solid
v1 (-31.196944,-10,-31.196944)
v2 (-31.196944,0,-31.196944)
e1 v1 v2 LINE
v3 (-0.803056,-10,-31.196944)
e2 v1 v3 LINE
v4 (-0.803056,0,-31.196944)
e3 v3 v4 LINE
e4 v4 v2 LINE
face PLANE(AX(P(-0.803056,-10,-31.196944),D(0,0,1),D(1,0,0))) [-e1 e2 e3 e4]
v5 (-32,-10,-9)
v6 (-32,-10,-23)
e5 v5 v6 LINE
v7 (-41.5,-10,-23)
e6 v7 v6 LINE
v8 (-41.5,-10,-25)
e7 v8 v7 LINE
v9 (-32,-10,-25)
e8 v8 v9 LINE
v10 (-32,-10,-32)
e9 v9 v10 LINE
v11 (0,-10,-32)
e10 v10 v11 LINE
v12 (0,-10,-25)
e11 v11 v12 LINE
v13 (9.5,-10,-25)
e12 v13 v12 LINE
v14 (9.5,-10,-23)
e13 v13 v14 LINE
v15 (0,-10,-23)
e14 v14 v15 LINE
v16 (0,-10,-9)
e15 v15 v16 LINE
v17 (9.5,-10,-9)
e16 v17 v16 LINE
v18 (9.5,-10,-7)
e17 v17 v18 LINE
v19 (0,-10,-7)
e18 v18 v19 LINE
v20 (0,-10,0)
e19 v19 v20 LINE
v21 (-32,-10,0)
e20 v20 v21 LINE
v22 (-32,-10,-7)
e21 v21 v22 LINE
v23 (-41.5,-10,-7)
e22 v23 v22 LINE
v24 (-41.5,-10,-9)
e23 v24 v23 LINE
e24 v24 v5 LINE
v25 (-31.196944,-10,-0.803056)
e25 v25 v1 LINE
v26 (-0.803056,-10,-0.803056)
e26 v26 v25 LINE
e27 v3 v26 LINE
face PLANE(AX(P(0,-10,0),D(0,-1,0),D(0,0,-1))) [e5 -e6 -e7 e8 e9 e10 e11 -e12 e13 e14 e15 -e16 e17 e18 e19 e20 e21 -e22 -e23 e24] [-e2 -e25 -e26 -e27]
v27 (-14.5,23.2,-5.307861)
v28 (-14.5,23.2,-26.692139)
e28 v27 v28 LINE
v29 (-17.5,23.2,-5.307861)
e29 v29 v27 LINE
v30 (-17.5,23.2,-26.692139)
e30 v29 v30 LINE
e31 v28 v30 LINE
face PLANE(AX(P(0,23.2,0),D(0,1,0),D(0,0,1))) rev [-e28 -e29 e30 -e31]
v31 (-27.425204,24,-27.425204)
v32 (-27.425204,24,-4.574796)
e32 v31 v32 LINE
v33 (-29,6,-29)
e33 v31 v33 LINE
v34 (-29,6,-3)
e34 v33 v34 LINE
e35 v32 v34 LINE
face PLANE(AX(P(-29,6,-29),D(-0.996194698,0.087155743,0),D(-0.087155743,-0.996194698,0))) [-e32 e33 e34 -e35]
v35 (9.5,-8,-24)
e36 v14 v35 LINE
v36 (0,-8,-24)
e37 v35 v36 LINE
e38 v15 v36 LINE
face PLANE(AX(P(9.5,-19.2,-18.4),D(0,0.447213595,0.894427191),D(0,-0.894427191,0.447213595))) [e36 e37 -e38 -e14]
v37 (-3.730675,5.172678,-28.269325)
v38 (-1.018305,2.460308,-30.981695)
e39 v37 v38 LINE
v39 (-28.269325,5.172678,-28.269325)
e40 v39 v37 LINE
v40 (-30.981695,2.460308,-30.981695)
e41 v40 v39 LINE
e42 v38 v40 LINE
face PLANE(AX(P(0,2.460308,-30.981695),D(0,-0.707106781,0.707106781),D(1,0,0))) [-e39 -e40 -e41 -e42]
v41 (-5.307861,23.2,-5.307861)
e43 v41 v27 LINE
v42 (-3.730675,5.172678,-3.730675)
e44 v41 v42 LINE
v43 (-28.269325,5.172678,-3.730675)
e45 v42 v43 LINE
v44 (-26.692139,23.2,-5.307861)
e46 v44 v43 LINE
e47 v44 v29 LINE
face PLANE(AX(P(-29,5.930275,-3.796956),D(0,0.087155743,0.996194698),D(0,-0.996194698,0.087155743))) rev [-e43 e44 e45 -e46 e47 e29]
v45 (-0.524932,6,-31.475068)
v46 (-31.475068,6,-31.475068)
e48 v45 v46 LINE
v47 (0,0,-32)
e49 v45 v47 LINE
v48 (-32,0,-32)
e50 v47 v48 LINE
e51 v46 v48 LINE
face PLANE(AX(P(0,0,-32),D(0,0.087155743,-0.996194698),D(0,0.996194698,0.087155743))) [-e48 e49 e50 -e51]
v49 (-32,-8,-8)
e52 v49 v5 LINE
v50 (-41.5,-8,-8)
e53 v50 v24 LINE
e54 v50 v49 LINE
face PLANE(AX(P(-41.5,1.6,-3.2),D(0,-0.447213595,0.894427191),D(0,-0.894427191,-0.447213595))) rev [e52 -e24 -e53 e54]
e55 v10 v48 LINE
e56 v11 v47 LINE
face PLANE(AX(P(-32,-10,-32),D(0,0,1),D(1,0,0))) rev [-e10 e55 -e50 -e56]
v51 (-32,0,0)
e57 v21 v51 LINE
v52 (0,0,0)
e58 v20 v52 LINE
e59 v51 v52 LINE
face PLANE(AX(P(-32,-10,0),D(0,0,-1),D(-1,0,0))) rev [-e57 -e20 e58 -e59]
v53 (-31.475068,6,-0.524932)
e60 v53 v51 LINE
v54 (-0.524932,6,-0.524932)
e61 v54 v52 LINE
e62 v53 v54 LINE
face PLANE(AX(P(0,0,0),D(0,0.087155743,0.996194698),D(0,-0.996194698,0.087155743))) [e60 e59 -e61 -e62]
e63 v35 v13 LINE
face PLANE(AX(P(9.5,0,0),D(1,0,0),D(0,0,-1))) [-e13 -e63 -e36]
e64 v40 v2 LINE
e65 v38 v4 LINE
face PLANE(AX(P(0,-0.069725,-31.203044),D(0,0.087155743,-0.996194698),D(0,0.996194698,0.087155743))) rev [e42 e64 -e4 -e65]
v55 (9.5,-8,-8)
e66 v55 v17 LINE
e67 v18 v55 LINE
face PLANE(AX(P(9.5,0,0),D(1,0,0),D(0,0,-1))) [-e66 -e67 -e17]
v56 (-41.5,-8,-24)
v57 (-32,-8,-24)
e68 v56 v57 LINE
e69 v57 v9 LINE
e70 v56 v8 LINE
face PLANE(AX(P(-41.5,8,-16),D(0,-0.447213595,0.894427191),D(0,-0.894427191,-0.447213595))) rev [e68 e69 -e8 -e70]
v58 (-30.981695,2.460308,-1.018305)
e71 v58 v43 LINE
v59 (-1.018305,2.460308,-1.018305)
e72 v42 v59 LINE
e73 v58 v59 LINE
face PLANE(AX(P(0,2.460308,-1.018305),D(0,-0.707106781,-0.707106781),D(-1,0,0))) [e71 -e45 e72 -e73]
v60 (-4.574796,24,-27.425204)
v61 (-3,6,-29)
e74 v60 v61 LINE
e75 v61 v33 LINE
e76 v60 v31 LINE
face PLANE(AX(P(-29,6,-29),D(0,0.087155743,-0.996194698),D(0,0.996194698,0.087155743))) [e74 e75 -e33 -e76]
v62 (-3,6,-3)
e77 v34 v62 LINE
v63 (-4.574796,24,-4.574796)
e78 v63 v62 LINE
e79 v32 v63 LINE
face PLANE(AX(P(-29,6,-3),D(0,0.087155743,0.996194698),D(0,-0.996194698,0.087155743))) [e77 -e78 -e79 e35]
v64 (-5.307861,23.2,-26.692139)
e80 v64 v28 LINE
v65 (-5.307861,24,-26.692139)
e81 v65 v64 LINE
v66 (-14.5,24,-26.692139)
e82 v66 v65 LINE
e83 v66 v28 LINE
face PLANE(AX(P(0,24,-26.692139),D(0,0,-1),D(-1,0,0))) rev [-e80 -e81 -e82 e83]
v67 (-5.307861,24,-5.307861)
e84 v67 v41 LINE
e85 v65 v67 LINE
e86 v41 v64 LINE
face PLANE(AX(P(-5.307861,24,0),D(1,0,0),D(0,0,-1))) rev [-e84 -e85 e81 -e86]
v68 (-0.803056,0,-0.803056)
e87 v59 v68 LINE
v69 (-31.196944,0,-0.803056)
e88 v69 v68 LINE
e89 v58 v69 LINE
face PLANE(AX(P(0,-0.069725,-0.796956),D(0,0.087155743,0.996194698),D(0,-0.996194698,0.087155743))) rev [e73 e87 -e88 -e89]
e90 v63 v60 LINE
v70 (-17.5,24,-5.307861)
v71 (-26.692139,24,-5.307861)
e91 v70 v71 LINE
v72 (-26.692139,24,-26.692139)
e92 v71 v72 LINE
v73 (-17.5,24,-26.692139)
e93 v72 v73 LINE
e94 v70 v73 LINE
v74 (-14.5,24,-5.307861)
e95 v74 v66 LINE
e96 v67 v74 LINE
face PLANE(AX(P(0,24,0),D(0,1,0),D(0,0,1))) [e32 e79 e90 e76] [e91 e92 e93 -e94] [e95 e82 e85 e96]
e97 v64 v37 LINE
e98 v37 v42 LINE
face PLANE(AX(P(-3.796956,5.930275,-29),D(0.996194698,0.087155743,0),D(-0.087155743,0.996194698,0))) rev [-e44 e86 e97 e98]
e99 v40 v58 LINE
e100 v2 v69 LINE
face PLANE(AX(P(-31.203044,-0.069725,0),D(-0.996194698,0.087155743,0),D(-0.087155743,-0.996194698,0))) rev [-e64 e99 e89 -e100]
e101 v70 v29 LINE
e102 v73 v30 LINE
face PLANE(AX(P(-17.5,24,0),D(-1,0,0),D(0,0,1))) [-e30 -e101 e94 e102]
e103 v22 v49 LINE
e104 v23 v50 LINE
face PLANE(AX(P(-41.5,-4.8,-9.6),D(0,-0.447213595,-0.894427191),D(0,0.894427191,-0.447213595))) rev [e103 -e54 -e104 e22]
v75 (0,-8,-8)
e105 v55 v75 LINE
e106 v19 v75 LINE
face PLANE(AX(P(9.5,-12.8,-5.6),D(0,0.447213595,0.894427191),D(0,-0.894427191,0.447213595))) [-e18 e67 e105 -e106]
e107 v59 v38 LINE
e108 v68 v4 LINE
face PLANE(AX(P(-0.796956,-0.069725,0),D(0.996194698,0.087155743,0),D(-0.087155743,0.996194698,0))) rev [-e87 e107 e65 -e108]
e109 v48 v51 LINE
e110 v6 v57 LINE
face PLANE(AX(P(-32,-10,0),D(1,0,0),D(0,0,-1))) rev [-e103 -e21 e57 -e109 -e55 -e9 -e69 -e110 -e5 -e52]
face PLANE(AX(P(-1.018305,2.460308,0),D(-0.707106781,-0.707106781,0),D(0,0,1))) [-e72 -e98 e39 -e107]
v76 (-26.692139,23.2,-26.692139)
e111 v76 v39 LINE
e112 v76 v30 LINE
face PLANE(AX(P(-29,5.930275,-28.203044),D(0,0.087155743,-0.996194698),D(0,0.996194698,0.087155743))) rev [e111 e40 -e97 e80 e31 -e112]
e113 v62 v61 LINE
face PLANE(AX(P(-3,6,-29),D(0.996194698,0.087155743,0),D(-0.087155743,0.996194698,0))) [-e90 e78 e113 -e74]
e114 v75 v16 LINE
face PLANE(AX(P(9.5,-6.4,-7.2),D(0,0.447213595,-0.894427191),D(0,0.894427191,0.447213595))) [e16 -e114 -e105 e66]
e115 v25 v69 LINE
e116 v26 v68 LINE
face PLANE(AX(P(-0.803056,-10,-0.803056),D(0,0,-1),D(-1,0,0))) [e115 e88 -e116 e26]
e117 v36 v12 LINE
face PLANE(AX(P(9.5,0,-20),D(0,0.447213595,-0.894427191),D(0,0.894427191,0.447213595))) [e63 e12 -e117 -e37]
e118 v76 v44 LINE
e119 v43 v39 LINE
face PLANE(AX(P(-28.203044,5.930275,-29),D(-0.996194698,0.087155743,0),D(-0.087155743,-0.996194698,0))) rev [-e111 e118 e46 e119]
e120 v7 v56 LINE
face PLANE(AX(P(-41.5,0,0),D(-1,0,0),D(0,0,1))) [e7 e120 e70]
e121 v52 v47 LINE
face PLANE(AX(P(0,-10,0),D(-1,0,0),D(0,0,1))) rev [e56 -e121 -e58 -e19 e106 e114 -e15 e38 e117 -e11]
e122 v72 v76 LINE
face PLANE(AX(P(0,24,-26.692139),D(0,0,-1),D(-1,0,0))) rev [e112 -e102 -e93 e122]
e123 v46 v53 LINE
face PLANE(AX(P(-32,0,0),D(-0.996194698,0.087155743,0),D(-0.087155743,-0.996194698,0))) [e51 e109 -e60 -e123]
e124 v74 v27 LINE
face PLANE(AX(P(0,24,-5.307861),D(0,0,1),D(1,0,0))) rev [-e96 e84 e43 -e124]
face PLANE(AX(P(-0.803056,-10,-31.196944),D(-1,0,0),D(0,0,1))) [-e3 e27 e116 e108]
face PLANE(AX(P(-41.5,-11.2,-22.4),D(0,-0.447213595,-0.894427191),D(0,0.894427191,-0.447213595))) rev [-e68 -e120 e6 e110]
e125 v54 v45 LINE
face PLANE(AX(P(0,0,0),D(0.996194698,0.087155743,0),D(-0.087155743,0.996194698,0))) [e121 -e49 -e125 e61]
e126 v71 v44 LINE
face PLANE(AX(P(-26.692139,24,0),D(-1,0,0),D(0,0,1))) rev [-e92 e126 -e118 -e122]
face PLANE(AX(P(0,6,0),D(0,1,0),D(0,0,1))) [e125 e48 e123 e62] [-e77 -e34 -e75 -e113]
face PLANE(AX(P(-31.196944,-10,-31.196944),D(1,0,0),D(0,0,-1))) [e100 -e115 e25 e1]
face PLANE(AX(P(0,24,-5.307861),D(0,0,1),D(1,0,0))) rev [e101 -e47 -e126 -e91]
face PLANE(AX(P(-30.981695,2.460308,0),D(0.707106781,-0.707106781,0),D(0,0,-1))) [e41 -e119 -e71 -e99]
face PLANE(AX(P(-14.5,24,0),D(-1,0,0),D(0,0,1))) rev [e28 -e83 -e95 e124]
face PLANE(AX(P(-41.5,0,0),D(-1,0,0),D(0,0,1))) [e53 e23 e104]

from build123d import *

# Parameters (mm, degrees)
SKETCH1_W           = 32
SKETCH1_H           = 32
BOSS_EXTRUDE1_DEPTH = 6
BOSS_EXTRUDE1_TAPER = 5
SKETCH2_W           = 26
SKETCH2_H           = 26
BOSS_EXTRUDE2_DEPTH = 18
BOSS_EXTRUDE2_TAPER = 5
SHELL1_T            = -0.8
CHAMFER1_SIZE       = 2.5
CHAMFER1_SIZE_2     = 2.750157169
SKETCH3_W           = 9.192139117
SKETCH3_H           = 21.384278234
CUT_EXTRUDE1_DEPTH  = 51.855088412
SKETCH4_W           = 32
SKETCH4_H           = 32
SKETCH4_W_2         = 30.39388826
SKETCH4_H_2         = 30.39388826
BOSS_EXTRUDE3_DEPTH = 10
BOSS_EXTRUDE4_DEPTH = 9.5
BOSS_EXTRUDE5_START = -32
BOSS_EXTRUDE5_DEPTH = 9.5


with BuildPart() as part:
    # Sketch1 → Boss-Extrude1 (new body)
    with BuildSketch(Plane(origin=(0, 0, 0), x_dir=(1, 0, 0), z_dir=(0, 1, 0))):
        with Locations((-16, 16)):
            Rectangle(SKETCH1_W, SKETCH1_H)
    extrude(amount=BOSS_EXTRUDE1_DEPTH, taper=BOSS_EXTRUDE1_TAPER)

    # Sketch2 → Boss-Extrude2 (add)
    with BuildSketch(Plane(origin=(0, 6, 0), x_dir=(1, 0, 0), z_dir=(0, 1, 0))):
        with Locations((-16, 16)):
            Rectangle(SKETCH2_W, SKETCH2_H)
    extrude(amount=BOSS_EXTRUDE2_DEPTH, taper=BOSS_EXTRUDE2_TAPER)

    # Shell1
    shell1_openings = [part.faces().sort_by_distance(p)[0] for p in [
        (-16, 0, -16),
    ]]
    offset(amount=SHELL1_T, openings=shell1_openings, kind=Kind.INTERSECTION)

    # Chamfer1
    # the kernel refuses this chamfer: 2.750157169, 2.5 mm, written as the material it adds along each edge
    with BuildSketch(Plane(origin=(5.830274952, 5.2, -1.25799692), x_dir=(0, 0.030161850139926293, -0.9995450278982617), z_dir=(-1, 0, 0))) as chamfer1_piece_1_section:
        Polygon((CHAMFER1_SIZE * 0.999545027898, CHAMFER1_SIZE * 0.0301618501399), (-CHAMFER1_SIZE_2 * 0.117163164513, CHAMFER1_SIZE_2 * 0.993112678869), (0, 0), align=None)
    chamfer1_piece_1 = extrude(amount=43.660549905, mode=Mode.PRIVATE)
    chamfer1_piece_1 = split(chamfer1_piece_1, bisect_by=Plane(origin=(-1.2737044, 5.379537315, -3.779154262), z_dir=(-0.9961946980917455, -0.08715574274765792, 0)), keep=Keep.TOP, mode=Mode.PRIVATE)
    chamfer1_piece_1 = split(chamfer1_piece_1, bisect_by=Plane(origin=(-3.729971497, 5.164641789, -3.779154262), z_dir=(0.9961946980917455, 0.08715574274765821, 0)), keep=Keep.TOP, mode=Mode.PRIVATE)
    chamfer1_piece_1 = split(chamfer1_piece_1, bisect_by=Plane(origin=(-2.501837948, 5.275543614, -3.739674149), z_dir=(0, -0.08715574274765829, -0.9961946980917455)), keep=Keep.TOP, mode=Mode.PRIVATE)
    add(chamfer1_piece_1)
    with BuildSketch(Plane(origin=(5.830274952, 5.2, -1.25799692), x_dir=(0, 0.030161850139926293, -0.9995450278982617), z_dir=(-1, 0, 0))) as chamfer1_piece_2_section:
        Polygon((CHAMFER1_SIZE * 0.999545027898, CHAMFER1_SIZE * 0.0301618501399), (-CHAMFER1_SIZE_2 * 0.117163164513, CHAMFER1_SIZE_2 * 0.993112678869), (0, 0), align=None)
    chamfer1_piece_2 = extrude(amount=43.660549905, mode=Mode.PRIVATE)
    chamfer1_piece_2 = split(chamfer1_piece_2, bisect_by=Plane(origin=(-1.187972058, 4.399612159, -1.99521412), z_dir=(-0.9961946980917455, -0.08715574274765792, 0)), keep=Keep.TOP, mode=Mode.PRIVATE)
    chamfer1_piece_2 = split(chamfer1_piece_2, bisect_by=Plane(origin=(-3.644239154, 4.184716633, -1.99521412), z_dir=(0.9961946980917455, 0.08715574274765821, 0)), keep=Keep.TOP, mode=Mode.PRIVATE)
    chamfer1_piece_2 = split(chamfer1_piece_2, bisect_by=Plane(origin=(-2.416105606, 4.148173113, -3.641042011), z_dir=(0, 0.08715574274765829, 0.9961946980917455)), keep=Keep.TOP, mode=Mode.PRIVATE)
    add(chamfer1_piece_2)
    with BuildSketch(Plane(origin=(5.830274952, 5.2, -1.25799692), x_dir=(0, 0.030161850139926293, -0.9995450278982617), z_dir=(-1, 0, 0))) as chamfer1_piece_3_section:
        Polygon((CHAMFER1_SIZE * 0.999545027898, CHAMFER1_SIZE * 0.0301618501399), (-CHAMFER1_SIZE_2 * 0.117163164513, CHAMFER1_SIZE_2 * 0.993112678869), (0, 0), align=None)
    chamfer1_piece_3 = extrude(amount=43.660549905, mode=Mode.PRIVATE)
    chamfer1_piece_3 = split(chamfer1_piece_3, bisect_by=Plane(origin=(-3.747130429, 5.360769289, -1.993289961), z_dir=(-0.9961946980917455, -0.08715574274765821, 0)), keep=Keep.TOP, mode=Mode.PRIVATE)
    chamfer1_piece_3 = split(chamfer1_piece_3, bisect_by=Plane(origin=(-16, 4.144649452, -3.64073373), z_dir=(0, 0.08715574274765829, 0.9961946980917455)), keep=Keep.TOP, mode=Mode.PRIVATE)
    chamfer1_piece_3 = split(chamfer1_piece_3, bisect_by=Plane(origin=(-28.252869571, 5.360769289, -1.993289961), z_dir=(0.9961946980917455, -0.08715574274765829, 0)), keep=Keep.TOP, mode=Mode.PRIVATE)
    add(chamfer1_piece_3)
    with BuildSketch(Plane(origin=(5.830274952, 5.2, -1.25799692), x_dir=(0, 0.030161850139926293, -0.9995450278982617), z_dir=(-1, 0, 0))) as chamfer1_piece_4_section:
        Polygon((CHAMFER1_SIZE * 0.999545027898, CHAMFER1_SIZE * 0.0301618501399), (-CHAMFER1_SIZE_2 * 0.117163164513, CHAMFER1_SIZE_2 * 0.993112678869), (0, 0), align=None)
    chamfer1_piece_4 = extrude(amount=43.660549905, mode=Mode.PRIVATE)
    chamfer1_piece_4 = split(chamfer1_piece_4, bisect_by=Plane(origin=(-29.498162052, 5.275543614, -3.739674149), z_dir=(0, -0.08715574274765829, -0.9961946980917455)), keep=Keep.TOP, mode=Mode.PRIVATE)
    chamfer1_piece_4 = split(chamfer1_piece_4, bisect_by=Plane(origin=(-28.270028503, 5.164641789, -3.779154262), z_dir=(-0.9961946980917455, 0.08715574274765829, 0)), keep=Keep.TOP, mode=Mode.PRIVATE)
    chamfer1_piece_4 = split(chamfer1_piece_4, bisect_by=Plane(origin=(-30.7262956, 5.379537315, -3.779154262), z_dir=(0.9961946980917455, -0.08715574274765851, 0)), keep=Keep.TOP, mode=Mode.PRIVATE)
    add(chamfer1_piece_4)
    with BuildSketch(Plane(origin=(5.830274952, 5.2, -1.25799692), x_dir=(0, 0.030161850139926293, -0.9995450278982617), z_dir=(-1, 0, 0))) as chamfer1_piece_5_section:
        Polygon((CHAMFER1_SIZE * 0.999545027898, CHAMFER1_SIZE * 0.0301618501399), (-CHAMFER1_SIZE_2 * 0.117163164513, CHAMFER1_SIZE_2 * 0.993112678869), (0, 0), align=None)
    chamfer1_piece_5 = extrude(amount=43.660549905, mode=Mode.PRIVATE)
    chamfer1_piece_5 = split(chamfer1_piece_5, bisect_by=Plane(origin=(-29.583894394, 4.148173113, -3.641042011), z_dir=(0, 0.08715574274765829, 0.9961946980917455)), keep=Keep.TOP, mode=Mode.PRIVATE)
    chamfer1_piece_5 = split(chamfer1_piece_5, bisect_by=Plane(origin=(-28.355760846, 4.184716633, -1.99521412), z_dir=(-0.9961946980917455, 0.08715574274765829, 0)), keep=Keep.TOP, mode=Mode.PRIVATE)
    chamfer1_piece_5 = split(chamfer1_piece_5, bisect_by=Plane(origin=(-30.812027942, 4.399612159, -1.99521412), z_dir=(0.9961946980917455, -0.08715574274765851, 0)), keep=Keep.TOP, mode=Mode.PRIVATE)
    add(chamfer1_piece_5)
    with BuildSketch(Plane(origin=(-30.74200308, 5.2, 5.830274952), x_dir=(0.9995450278982617, 0.030161850139926356, 0), z_dir=(0, 0, -1))) as chamfer1_piece_6_section:
        Polygon((CHAMFER1_SIZE * 0.999545027898, CHAMFER1_SIZE * 0.0301618501399), (-CHAMFER1_SIZE_2 * 0.117163164513, CHAMFER1_SIZE_2 * 0.993112678869), (0, 0), align=None)
    chamfer1_piece_6 = extrude(amount=43.660549905, mode=Mode.PRIVATE)
    chamfer1_piece_6 = split(chamfer1_piece_6, bisect_by=Plane(origin=(-28.220845738, 5.164641789, -3.729971497), z_dir=(0, 0.08715574274765829, 0.9961946980917455)), keep=Keep.TOP, mode=Mode.PRIVATE)
    chamfer1_piece_6 = split(chamfer1_piece_6, bisect_by=Plane(origin=(-28.260325851, 5.275543614, -2.501837948), z_dir=(0.9961946980917455, -0.08715574274765829, 0)), keep=Keep.TOP, mode=Mode.PRIVATE)
    chamfer1_piece_6 = split(chamfer1_piece_6, bisect_by=Plane(origin=(-28.220845738, 5.379537315, -1.2737044), z_dir=(0, -0.08715574274765792, -0.9961946980917455)), keep=Keep.TOP, mode=Mode.PRIVATE)
    add(chamfer1_piece_6)
    with BuildSketch(Plane(origin=(-30.74200308, 5.2, 5.830274952), x_dir=(0.9995450278982617, 0.030161850139926356, 0), z_dir=(0, 0, -1))) as chamfer1_piece_7_section:
        Polygon((CHAMFER1_SIZE * 0.999545027898, CHAMFER1_SIZE * 0.0301618501399), (-CHAMFER1_SIZE_2 * 0.117163164513, CHAMFER1_SIZE_2 * 0.993112678869), (0, 0), align=None)
    chamfer1_piece_7 = extrude(amount=43.660549905, mode=Mode.PRIVATE)
    chamfer1_piece_7 = split(chamfer1_piece_7, bisect_by=Plane(origin=(-30.00478588, 4.184716633, -3.644239154), z_dir=(0, 0.08715574274765829, 0.9961946980917455)), keep=Keep.TOP, mode=Mode.PRIVATE)
    chamfer1_piece_7 = split(chamfer1_piece_7, bisect_by=Plane(origin=(-28.358957989, 4.148173113, -2.416105606), z_dir=(-0.9961946980917455, 0.08715574274765829, 0)), keep=Keep.TOP, mode=Mode.PRIVATE)
    chamfer1_piece_7 = split(chamfer1_piece_7, bisect_by=Plane(origin=(-30.00478588, 4.399612159, -1.187972058), z_dir=(0, -0.08715574274765792, -0.9961946980917455)), keep=Keep.TOP, mode=Mode.PRIVATE)
    add(chamfer1_piece_7)
    with BuildSketch(Plane(origin=(-30.74200308, 5.2, 5.830274952), x_dir=(0.9995450278982617, 0.030161850139926356, 0), z_dir=(0, 0, -1))) as chamfer1_piece_8_section:
        Polygon((CHAMFER1_SIZE * 0.999545027898, CHAMFER1_SIZE * 0.0301618501399), (-CHAMFER1_SIZE_2 * 0.117163164513, CHAMFER1_SIZE_2 * 0.993112678869), (0, 0), align=None)
    chamfer1_piece_8 = extrude(amount=43.660549905, mode=Mode.PRIVATE)
    chamfer1_piece_8 = split(chamfer1_piece_8, bisect_by=Plane(origin=(-30.006710039, 5.360769289, -28.252869571), z_dir=(0, -0.08715574274765829, 0.9961946980917455)), keep=Keep.TOP, mode=Mode.PRIVATE)
    chamfer1_piece_8 = split(chamfer1_piece_8, bisect_by=Plane(origin=(-30.006710039, 5.360769289, -3.747130429), z_dir=(0, -0.08715574274765829, -0.9961946980917455)), keep=Keep.TOP, mode=Mode.PRIVATE)
    chamfer1_piece_8 = split(chamfer1_piece_8, bisect_by=Plane(origin=(-28.35926627, 4.144649452, -16), z_dir=(-0.9961946980917455, 0.08715574274765829, 0)), keep=Keep.TOP, mode=Mode.PRIVATE)
    add(chamfer1_piece_8)
    with BuildSketch(Plane(origin=(-30.74200308, 5.2, 5.830274952), x_dir=(0.9995450278982617, 0.030161850139926356, 0), z_dir=(0, 0, -1))) as chamfer1_piece_9_section:
        Polygon((CHAMFER1_SIZE * 0.999545027898, CHAMFER1_SIZE * 0.0301618501399), (-CHAMFER1_SIZE_2 * 0.117163164513, CHAMFER1_SIZE_2 * 0.993112678869), (0, 0), align=None)
    chamfer1_piece_9 = extrude(amount=43.660549905, mode=Mode.PRIVATE)
    chamfer1_piece_9 = split(chamfer1_piece_9, bisect_by=Plane(origin=(-28.220845738, 5.379537315, -30.7262956), z_dir=(0, -0.08715574274765836, 0.9961946980917455)), keep=Keep.TOP, mode=Mode.PRIVATE)
    chamfer1_piece_9 = split(chamfer1_piece_9, bisect_by=Plane(origin=(-28.220845738, 5.164641789, -28.270028503), z_dir=(0, 0.08715574274765829, -0.9961946980917455)), keep=Keep.TOP, mode=Mode.PRIVATE)
    chamfer1_piece_9 = split(chamfer1_piece_9, bisect_by=Plane(origin=(-28.260325851, 5.275543614, -29.498162052), z_dir=(0.9961946980917455, -0.08715574274765829, 0)), keep=Keep.TOP, mode=Mode.PRIVATE)
    add(chamfer1_piece_9)
    with BuildSketch(Plane(origin=(-30.74200308, 5.2, 5.830274952), x_dir=(0.9995450278982617, 0.030161850139926356, 0), z_dir=(0, 0, -1))) as chamfer1_piece_10_section:
        Polygon((CHAMFER1_SIZE * 0.999545027898, CHAMFER1_SIZE * 0.0301618501399), (-CHAMFER1_SIZE_2 * 0.117163164513, CHAMFER1_SIZE_2 * 0.993112678869), (0, 0), align=None)
    chamfer1_piece_10 = extrude(amount=43.660549905, mode=Mode.PRIVATE)
    chamfer1_piece_10 = split(chamfer1_piece_10, bisect_by=Plane(origin=(-30.00478588, 4.399612159, -30.812027942), z_dir=(0, -0.08715574274765836, 0.9961946980917455)), keep=Keep.TOP, mode=Mode.PRIVATE)
    chamfer1_piece_10 = split(chamfer1_piece_10, bisect_by=Plane(origin=(-30.00478588, 4.184716633, -28.355760846), z_dir=(0, 0.08715574274765829, -0.9961946980917455)), keep=Keep.TOP, mode=Mode.PRIVATE)
    chamfer1_piece_10 = split(chamfer1_piece_10, bisect_by=Plane(origin=(-28.358957989, 4.148173113, -29.583894394), z_dir=(-0.9961946980917455, 0.08715574274765829, 0)), keep=Keep.TOP, mode=Mode.PRIVATE)
    add(chamfer1_piece_10)
    with BuildSketch(Plane(origin=(5.830274952, 5.2, -30.74200308), x_dir=(0, -0.9937112432628153, -0.11197305485280758), z_dir=(-1, 0, 0))) as chamfer1_piece_11_section:
        Polygon((CHAMFER1_SIZE_2 * 0.99968896676, CHAMFER1_SIZE_2 * 0.0249393220908), (-CHAMFER1_SIZE * 0.111973054853, CHAMFER1_SIZE * 0.993711243263), (0, 0), align=None)
    chamfer1_piece_11 = extrude(amount=43.660549905, mode=Mode.PRIVATE)
    chamfer1_piece_11 = split(chamfer1_piece_11, bisect_by=Plane(origin=(-1.187972058, 4.399612159, -30.00478588), z_dir=(-0.9961946980917455, -0.08715574274765792, 0)), keep=Keep.TOP, mode=Mode.PRIVATE)
    chamfer1_piece_11 = split(chamfer1_piece_11, bisect_by=Plane(origin=(-2.416105606, 4.148173113, -28.358957989), z_dir=(0, 0.08715574274765829, -0.9961946980917455)), keep=Keep.TOP, mode=Mode.PRIVATE)
    chamfer1_piece_11 = split(chamfer1_piece_11, bisect_by=Plane(origin=(-3.644239154, 4.184716633, -30.00478588), z_dir=(0.9961946980917455, 0.08715574274765821, 0)), keep=Keep.TOP, mode=Mode.PRIVATE)
    add(chamfer1_piece_11)
    with BuildSketch(Plane(origin=(5.830274952, 5.2, -30.74200308), x_dir=(0, -0.9937112432628153, -0.11197305485280758), z_dir=(-1, 0, 0))) as chamfer1_piece_12_section:
        Polygon((CHAMFER1_SIZE_2 * 0.99968896676, CHAMFER1_SIZE_2 * 0.0249393220908), (-CHAMFER1_SIZE * 0.111973054853, CHAMFER1_SIZE * 0.993711243263), (0, 0), align=None)
    chamfer1_piece_12 = extrude(amount=43.660549905, mode=Mode.PRIVATE)
    chamfer1_piece_12 = split(chamfer1_piece_12, bisect_by=Plane(origin=(-1.2737044, 5.379537315, -28.220845738), z_dir=(-0.9961946980917455, -0.08715574274765792, 0)), keep=Keep.TOP, mode=Mode.PRIVATE)
    chamfer1_piece_12 = split(chamfer1_piece_12, bisect_by=Plane(origin=(-2.501837948, 5.275543614, -28.260325851), z_dir=(0, -0.08715574274765829, 0.9961946980917455)), keep=Keep.TOP, mode=Mode.PRIVATE)
    chamfer1_piece_12 = split(chamfer1_piece_12, bisect_by=Plane(origin=(-3.729971497, 5.164641789, -28.220845738), z_dir=(0.9961946980917455, 0.08715574274765821, 0)), keep=Keep.TOP, mode=Mode.PRIVATE)
    add(chamfer1_piece_12)
    with BuildSketch(Plane(origin=(5.830274952, 5.2, -30.74200308), x_dir=(0, -0.9937112432628153, -0.11197305485280758), z_dir=(-1, 0, 0))) as chamfer1_piece_13_section:
        Polygon((CHAMFER1_SIZE_2 * 0.99968896676, CHAMFER1_SIZE_2 * 0.0249393220908), (-CHAMFER1_SIZE * 0.111973054853, CHAMFER1_SIZE * 0.993711243263), (0, 0), align=None)
    chamfer1_piece_13 = extrude(amount=43.660549905, mode=Mode.PRIVATE)
    chamfer1_piece_13 = split(chamfer1_piece_13, bisect_by=Plane(origin=(-16, 4.144649452, -28.35926627), z_dir=(0, 0.08715574274765829, -0.9961946980917455)), keep=Keep.TOP, mode=Mode.PRIVATE)
    chamfer1_piece_13 = split(chamfer1_piece_13, bisect_by=Plane(origin=(-3.747130429, 5.360769289, -30.006710039), z_dir=(-0.9961946980917455, -0.08715574274765821, 0)), keep=Keep.TOP, mode=Mode.PRIVATE)
    chamfer1_piece_13 = split(chamfer1_piece_13, bisect_by=Plane(origin=(-28.252869571, 5.360769289, -30.006710039), z_dir=(0.9961946980917455, -0.08715574274765829, 0)), keep=Keep.TOP, mode=Mode.PRIVATE)
    add(chamfer1_piece_13)
    with BuildSketch(Plane(origin=(5.830274952, 5.2, -30.74200308), x_dir=(0, -0.9937112432628153, -0.11197305485280758), z_dir=(-1, 0, 0))) as chamfer1_piece_14_section:
        Polygon((CHAMFER1_SIZE_2 * 0.99968896676, CHAMFER1_SIZE_2 * 0.0249393220908), (-CHAMFER1_SIZE * 0.111973054853, CHAMFER1_SIZE * 0.993711243263), (0, 0), align=None)
    chamfer1_piece_14 = extrude(amount=43.660549905, mode=Mode.PRIVATE)
    chamfer1_piece_14 = split(chamfer1_piece_14, bisect_by=Plane(origin=(-30.812027942, 4.399612159, -30.00478588), z_dir=(0.9961946980917455, -0.08715574274765851, 0)), keep=Keep.TOP, mode=Mode.PRIVATE)
    chamfer1_piece_14 = split(chamfer1_piece_14, bisect_by=Plane(origin=(-29.583894394, 4.148173113, -28.358957989), z_dir=(0, 0.08715574274765829, -0.9961946980917455)), keep=Keep.TOP, mode=Mode.PRIVATE)
    chamfer1_piece_14 = split(chamfer1_piece_14, bisect_by=Plane(origin=(-28.355760846, 4.184716633, -30.00478588), z_dir=(-0.9961946980917455, 0.08715574274765829, 0)), keep=Keep.TOP, mode=Mode.PRIVATE)
    add(chamfer1_piece_14)
    with BuildSketch(Plane(origin=(5.830274952, 5.2, -30.74200308), x_dir=(0, -0.9937112432628153, -0.11197305485280758), z_dir=(-1, 0, 0))) as chamfer1_piece_15_section:
        Polygon((CHAMFER1_SIZE_2 * 0.99968896676, CHAMFER1_SIZE_2 * 0.0249393220908), (-CHAMFER1_SIZE * 0.111973054853, CHAMFER1_SIZE * 0.993711243263), (0, 0), align=None)
    chamfer1_piece_15 = extrude(amount=43.660549905, mode=Mode.PRIVATE)
    chamfer1_piece_15 = split(chamfer1_piece_15, bisect_by=Plane(origin=(-30.7262956, 5.379537315, -28.220845738), z_dir=(0.9961946980917455, -0.08715574274765851, 0)), keep=Keep.TOP, mode=Mode.PRIVATE)
    chamfer1_piece_15 = split(chamfer1_piece_15, bisect_by=Plane(origin=(-29.498162052, 5.275543614, -28.260325851), z_dir=(0, -0.08715574274765829, 0.9961946980917455)), keep=Keep.TOP, mode=Mode.PRIVATE)
    chamfer1_piece_15 = split(chamfer1_piece_15, bisect_by=Plane(origin=(-28.270028503, 5.164641789, -28.220845738), z_dir=(-0.9961946980917455, 0.08715574274765829, 0)), keep=Keep.TOP, mode=Mode.PRIVATE)
    add(chamfer1_piece_15)
    with BuildSketch(Plane(origin=(-1.25799692, 5.2, 5.830274952), x_dir=(0.11197305485280797, -0.9937112432628151, 0), z_dir=(0, 0, -1))) as chamfer1_piece_16_section:
        Polygon((CHAMFER1_SIZE_2 * 0.99968896676, CHAMFER1_SIZE_2 * 0.0249393220908), (-CHAMFER1_SIZE * 0.111973054853, CHAMFER1_SIZE * 0.993711243263), (0, 0), align=None)
    chamfer1_piece_16 = extrude(amount=43.660549905, mode=Mode.PRIVATE)
    chamfer1_piece_16 = split(chamfer1_piece_16, bisect_by=Plane(origin=(-1.99521412, 4.399612159, -1.187972058), z_dir=(0, -0.08715574274765792, -0.9961946980917455)), keep=Keep.TOP, mode=Mode.PRIVATE)
    chamfer1_piece_16 = split(chamfer1_piece_16, bisect_by=Plane(origin=(-3.641042011, 4.148173113, -2.416105606), z_dir=(0.9961946980917455, 0.08715574274765821, 0)), keep=Keep.TOP, mode=Mode.PRIVATE)
    chamfer1_piece_16 = split(chamfer1_piece_16, bisect_by=Plane(origin=(-1.99521412, 4.184716633, -3.644239154), z_dir=(0, 0.08715574274765829, 0.9961946980917455)), keep=Keep.TOP, mode=Mode.PRIVATE)
    add(chamfer1_piece_16)
    with BuildSketch(Plane(origin=(-1.25799692, 5.2, 5.830274952), x_dir=(0.11197305485280797, -0.9937112432628151, 0), z_dir=(0, 0, -1))) as chamfer1_piece_17_section:
        Polygon((CHAMFER1_SIZE_2 * 0.99968896676, CHAMFER1_SIZE_2 * 0.0249393220908), (-CHAMFER1_SIZE * 0.111973054853, CHAMFER1_SIZE * 0.993711243263), (0, 0), align=None)
    chamfer1_piece_17 = extrude(amount=43.660549905, mode=Mode.PRIVATE)
    chamfer1_piece_17 = split(chamfer1_piece_17, bisect_by=Plane(origin=(-3.779154262, 5.379537315, -1.2737044), z_dir=(0, -0.08715574274765792, -0.9961946980917455)), keep=Keep.TOP, mode=Mode.PRIVATE)
    chamfer1_piece_17 = split(chamfer1_piece_17, bisect_by=Plane(origin=(-3.739674149, 5.275543614, -2.501837948), z_dir=(-0.9961946980917455, -0.08715574274765821, 0)), keep=Keep.TOP, mode=Mode.PRIVATE)
    chamfer1_piece_17 = split(chamfer1_piece_17, bisect_by=Plane(origin=(-3.779154262, 5.164641789, -3.729971497), z_dir=(0, 0.08715574274765829, 0.9961946980917455)), keep=Keep.TOP, mode=Mode.PRIVATE)
    add(chamfer1_piece_17)
    with BuildSketch(Plane(origin=(-1.25799692, 5.2, 5.830274952), x_dir=(0.11197305485280797, -0.9937112432628151, 0), z_dir=(0, 0, -1))) as chamfer1_piece_18_section:
        Polygon((CHAMFER1_SIZE_2 * 0.99968896676, CHAMFER1_SIZE_2 * 0.0249393220908), (-CHAMFER1_SIZE * 0.111973054853, CHAMFER1_SIZE * 0.993711243263), (0, 0), align=None)
    chamfer1_piece_18 = extrude(amount=43.660549905, mode=Mode.PRIVATE)
    chamfer1_piece_18 = split(chamfer1_piece_18, bisect_by=Plane(origin=(-1.993289961, 5.360769289, -28.252869571), z_dir=(0, -0.08715574274765829, 0.9961946980917455)), keep=Keep.TOP, mode=Mode.PRIVATE)
    chamfer1_piece_18 = split(chamfer1_piece_18, bisect_by=Plane(origin=(-3.64073373, 4.144649452, -16), z_dir=(0.9961946980917455, 0.08715574274765821, 0)), keep=Keep.TOP, mode=Mode.PRIVATE)
    chamfer1_piece_18 = split(chamfer1_piece_18, bisect_by=Plane(origin=(-1.993289961, 5.360769289, -3.747130429), z_dir=(0, -0.08715574274765829, -0.9961946980917455)), keep=Keep.TOP, mode=Mode.PRIVATE)
    add(chamfer1_piece_18)
    with BuildSketch(Plane(origin=(-1.25799692, 5.2, 5.830274952), x_dir=(0.11197305485280797, -0.9937112432628151, 0), z_dir=(0, 0, -1))) as chamfer1_piece_19_section:
        Polygon((CHAMFER1_SIZE_2 * 0.99968896676, CHAMFER1_SIZE_2 * 0.0249393220908), (-CHAMFER1_SIZE * 0.111973054853, CHAMFER1_SIZE * 0.993711243263), (0, 0), align=None)
    chamfer1_piece_19 = extrude(amount=43.660549905, mode=Mode.PRIVATE)
    chamfer1_piece_19 = split(chamfer1_piece_19, bisect_by=Plane(origin=(-1.99521412, 4.399612159, -30.812027942), z_dir=(0, -0.08715574274765836, 0.9961946980917455)), keep=Keep.TOP, mode=Mode.PRIVATE)
    chamfer1_piece_19 = split(chamfer1_piece_19, bisect_by=Plane(origin=(-1.99521412, 4.184716633, -28.355760846), z_dir=(0, 0.08715574274765829, -0.9961946980917455)), keep=Keep.TOP, mode=Mode.PRIVATE)
    chamfer1_piece_19 = split(chamfer1_piece_19, bisect_by=Plane(origin=(-3.641042011, 4.148173113, -29.583894394), z_dir=(0.9961946980917455, 0.08715574274765821, 0)), keep=Keep.TOP, mode=Mode.PRIVATE)
    add(chamfer1_piece_19)
    with BuildSketch(Plane(origin=(-1.25799692, 5.2, 5.830274952), x_dir=(0.11197305485280797, -0.9937112432628151, 0), z_dir=(0, 0, -1))) as chamfer1_piece_20_section:
        Polygon((CHAMFER1_SIZE_2 * 0.99968896676, CHAMFER1_SIZE_2 * 0.0249393220908), (-CHAMFER1_SIZE * 0.111973054853, CHAMFER1_SIZE * 0.993711243263), (0, 0), align=None)
    chamfer1_piece_20 = extrude(amount=43.660549905, mode=Mode.PRIVATE)
    chamfer1_piece_20 = split(chamfer1_piece_20, bisect_by=Plane(origin=(-3.779154262, 5.379537315, -30.7262956), z_dir=(0, -0.08715574274765836, 0.9961946980917455)), keep=Keep.TOP, mode=Mode.PRIVATE)
    chamfer1_piece_20 = split(chamfer1_piece_20, bisect_by=Plane(origin=(-3.779154262, 5.164641789, -28.270028503), z_dir=(0, 0.08715574274765829, -0.9961946980917455)), keep=Keep.TOP, mode=Mode.PRIVATE)
    chamfer1_piece_20 = split(chamfer1_piece_20, bisect_by=Plane(origin=(-3.739674149, 5.275543614, -29.498162052), z_dir=(-0.9961946980917455, -0.08715574274765821, 0)), keep=Keep.TOP, mode=Mode.PRIVATE)
    add(chamfer1_piece_20)

    # Sketch3 → Cut-Extrude1 (cut, through all)
    with BuildSketch(Plane.XZ.offset(-23.2)):
        with Locations((-22.096069558, -16)):
            Rectangle(SKETCH3_W, SKETCH3_H)
        with Locations((-9.903930442, -16)):
            Rectangle(SKETCH3_W, SKETCH3_H)
    extrude(amount=-CUT_EXTRUDE1_DEPTH, mode=Mode.SUBTRACT)

    # Sketch4 → Boss-Extrude3 (add)
    with BuildSketch(Plane.XZ):
        with Locations((-16, -16)):
            Rectangle(SKETCH4_W, SKETCH4_H)
        with Locations((-16, -16)):
            Rectangle(SKETCH4_W_2, SKETCH4_H_2, mode=Mode.SUBTRACT)
    extrude(amount=BOSS_EXTRUDE3_DEPTH)

    # Sketch5 → Boss-Extrude4 (add)
    with BuildSketch(Plane.ZY.offset(32)):
        Polygon((-24, -8), (-25, -10), (-23, -10), align=None)
        Polygon((-8, -8), (-9, -10), (-7, -10), align=None)
    extrude(amount=BOSS_EXTRUDE4_DEPTH)

    # Sketch5<3> → Boss-Extrude5 (add)
    with BuildSketch(Plane.ZY.offset(32).offset(BOSS_EXTRUDE5_START)):
        Polygon((-8, -8), (-9, -10), (-7, -10), align=None)
        Polygon((-24, -8), (-25, -10), (-23, -10), align=None)
    extrude(amount=-BOSS_EXTRUDE5_DEPTH)


solid = part.part
